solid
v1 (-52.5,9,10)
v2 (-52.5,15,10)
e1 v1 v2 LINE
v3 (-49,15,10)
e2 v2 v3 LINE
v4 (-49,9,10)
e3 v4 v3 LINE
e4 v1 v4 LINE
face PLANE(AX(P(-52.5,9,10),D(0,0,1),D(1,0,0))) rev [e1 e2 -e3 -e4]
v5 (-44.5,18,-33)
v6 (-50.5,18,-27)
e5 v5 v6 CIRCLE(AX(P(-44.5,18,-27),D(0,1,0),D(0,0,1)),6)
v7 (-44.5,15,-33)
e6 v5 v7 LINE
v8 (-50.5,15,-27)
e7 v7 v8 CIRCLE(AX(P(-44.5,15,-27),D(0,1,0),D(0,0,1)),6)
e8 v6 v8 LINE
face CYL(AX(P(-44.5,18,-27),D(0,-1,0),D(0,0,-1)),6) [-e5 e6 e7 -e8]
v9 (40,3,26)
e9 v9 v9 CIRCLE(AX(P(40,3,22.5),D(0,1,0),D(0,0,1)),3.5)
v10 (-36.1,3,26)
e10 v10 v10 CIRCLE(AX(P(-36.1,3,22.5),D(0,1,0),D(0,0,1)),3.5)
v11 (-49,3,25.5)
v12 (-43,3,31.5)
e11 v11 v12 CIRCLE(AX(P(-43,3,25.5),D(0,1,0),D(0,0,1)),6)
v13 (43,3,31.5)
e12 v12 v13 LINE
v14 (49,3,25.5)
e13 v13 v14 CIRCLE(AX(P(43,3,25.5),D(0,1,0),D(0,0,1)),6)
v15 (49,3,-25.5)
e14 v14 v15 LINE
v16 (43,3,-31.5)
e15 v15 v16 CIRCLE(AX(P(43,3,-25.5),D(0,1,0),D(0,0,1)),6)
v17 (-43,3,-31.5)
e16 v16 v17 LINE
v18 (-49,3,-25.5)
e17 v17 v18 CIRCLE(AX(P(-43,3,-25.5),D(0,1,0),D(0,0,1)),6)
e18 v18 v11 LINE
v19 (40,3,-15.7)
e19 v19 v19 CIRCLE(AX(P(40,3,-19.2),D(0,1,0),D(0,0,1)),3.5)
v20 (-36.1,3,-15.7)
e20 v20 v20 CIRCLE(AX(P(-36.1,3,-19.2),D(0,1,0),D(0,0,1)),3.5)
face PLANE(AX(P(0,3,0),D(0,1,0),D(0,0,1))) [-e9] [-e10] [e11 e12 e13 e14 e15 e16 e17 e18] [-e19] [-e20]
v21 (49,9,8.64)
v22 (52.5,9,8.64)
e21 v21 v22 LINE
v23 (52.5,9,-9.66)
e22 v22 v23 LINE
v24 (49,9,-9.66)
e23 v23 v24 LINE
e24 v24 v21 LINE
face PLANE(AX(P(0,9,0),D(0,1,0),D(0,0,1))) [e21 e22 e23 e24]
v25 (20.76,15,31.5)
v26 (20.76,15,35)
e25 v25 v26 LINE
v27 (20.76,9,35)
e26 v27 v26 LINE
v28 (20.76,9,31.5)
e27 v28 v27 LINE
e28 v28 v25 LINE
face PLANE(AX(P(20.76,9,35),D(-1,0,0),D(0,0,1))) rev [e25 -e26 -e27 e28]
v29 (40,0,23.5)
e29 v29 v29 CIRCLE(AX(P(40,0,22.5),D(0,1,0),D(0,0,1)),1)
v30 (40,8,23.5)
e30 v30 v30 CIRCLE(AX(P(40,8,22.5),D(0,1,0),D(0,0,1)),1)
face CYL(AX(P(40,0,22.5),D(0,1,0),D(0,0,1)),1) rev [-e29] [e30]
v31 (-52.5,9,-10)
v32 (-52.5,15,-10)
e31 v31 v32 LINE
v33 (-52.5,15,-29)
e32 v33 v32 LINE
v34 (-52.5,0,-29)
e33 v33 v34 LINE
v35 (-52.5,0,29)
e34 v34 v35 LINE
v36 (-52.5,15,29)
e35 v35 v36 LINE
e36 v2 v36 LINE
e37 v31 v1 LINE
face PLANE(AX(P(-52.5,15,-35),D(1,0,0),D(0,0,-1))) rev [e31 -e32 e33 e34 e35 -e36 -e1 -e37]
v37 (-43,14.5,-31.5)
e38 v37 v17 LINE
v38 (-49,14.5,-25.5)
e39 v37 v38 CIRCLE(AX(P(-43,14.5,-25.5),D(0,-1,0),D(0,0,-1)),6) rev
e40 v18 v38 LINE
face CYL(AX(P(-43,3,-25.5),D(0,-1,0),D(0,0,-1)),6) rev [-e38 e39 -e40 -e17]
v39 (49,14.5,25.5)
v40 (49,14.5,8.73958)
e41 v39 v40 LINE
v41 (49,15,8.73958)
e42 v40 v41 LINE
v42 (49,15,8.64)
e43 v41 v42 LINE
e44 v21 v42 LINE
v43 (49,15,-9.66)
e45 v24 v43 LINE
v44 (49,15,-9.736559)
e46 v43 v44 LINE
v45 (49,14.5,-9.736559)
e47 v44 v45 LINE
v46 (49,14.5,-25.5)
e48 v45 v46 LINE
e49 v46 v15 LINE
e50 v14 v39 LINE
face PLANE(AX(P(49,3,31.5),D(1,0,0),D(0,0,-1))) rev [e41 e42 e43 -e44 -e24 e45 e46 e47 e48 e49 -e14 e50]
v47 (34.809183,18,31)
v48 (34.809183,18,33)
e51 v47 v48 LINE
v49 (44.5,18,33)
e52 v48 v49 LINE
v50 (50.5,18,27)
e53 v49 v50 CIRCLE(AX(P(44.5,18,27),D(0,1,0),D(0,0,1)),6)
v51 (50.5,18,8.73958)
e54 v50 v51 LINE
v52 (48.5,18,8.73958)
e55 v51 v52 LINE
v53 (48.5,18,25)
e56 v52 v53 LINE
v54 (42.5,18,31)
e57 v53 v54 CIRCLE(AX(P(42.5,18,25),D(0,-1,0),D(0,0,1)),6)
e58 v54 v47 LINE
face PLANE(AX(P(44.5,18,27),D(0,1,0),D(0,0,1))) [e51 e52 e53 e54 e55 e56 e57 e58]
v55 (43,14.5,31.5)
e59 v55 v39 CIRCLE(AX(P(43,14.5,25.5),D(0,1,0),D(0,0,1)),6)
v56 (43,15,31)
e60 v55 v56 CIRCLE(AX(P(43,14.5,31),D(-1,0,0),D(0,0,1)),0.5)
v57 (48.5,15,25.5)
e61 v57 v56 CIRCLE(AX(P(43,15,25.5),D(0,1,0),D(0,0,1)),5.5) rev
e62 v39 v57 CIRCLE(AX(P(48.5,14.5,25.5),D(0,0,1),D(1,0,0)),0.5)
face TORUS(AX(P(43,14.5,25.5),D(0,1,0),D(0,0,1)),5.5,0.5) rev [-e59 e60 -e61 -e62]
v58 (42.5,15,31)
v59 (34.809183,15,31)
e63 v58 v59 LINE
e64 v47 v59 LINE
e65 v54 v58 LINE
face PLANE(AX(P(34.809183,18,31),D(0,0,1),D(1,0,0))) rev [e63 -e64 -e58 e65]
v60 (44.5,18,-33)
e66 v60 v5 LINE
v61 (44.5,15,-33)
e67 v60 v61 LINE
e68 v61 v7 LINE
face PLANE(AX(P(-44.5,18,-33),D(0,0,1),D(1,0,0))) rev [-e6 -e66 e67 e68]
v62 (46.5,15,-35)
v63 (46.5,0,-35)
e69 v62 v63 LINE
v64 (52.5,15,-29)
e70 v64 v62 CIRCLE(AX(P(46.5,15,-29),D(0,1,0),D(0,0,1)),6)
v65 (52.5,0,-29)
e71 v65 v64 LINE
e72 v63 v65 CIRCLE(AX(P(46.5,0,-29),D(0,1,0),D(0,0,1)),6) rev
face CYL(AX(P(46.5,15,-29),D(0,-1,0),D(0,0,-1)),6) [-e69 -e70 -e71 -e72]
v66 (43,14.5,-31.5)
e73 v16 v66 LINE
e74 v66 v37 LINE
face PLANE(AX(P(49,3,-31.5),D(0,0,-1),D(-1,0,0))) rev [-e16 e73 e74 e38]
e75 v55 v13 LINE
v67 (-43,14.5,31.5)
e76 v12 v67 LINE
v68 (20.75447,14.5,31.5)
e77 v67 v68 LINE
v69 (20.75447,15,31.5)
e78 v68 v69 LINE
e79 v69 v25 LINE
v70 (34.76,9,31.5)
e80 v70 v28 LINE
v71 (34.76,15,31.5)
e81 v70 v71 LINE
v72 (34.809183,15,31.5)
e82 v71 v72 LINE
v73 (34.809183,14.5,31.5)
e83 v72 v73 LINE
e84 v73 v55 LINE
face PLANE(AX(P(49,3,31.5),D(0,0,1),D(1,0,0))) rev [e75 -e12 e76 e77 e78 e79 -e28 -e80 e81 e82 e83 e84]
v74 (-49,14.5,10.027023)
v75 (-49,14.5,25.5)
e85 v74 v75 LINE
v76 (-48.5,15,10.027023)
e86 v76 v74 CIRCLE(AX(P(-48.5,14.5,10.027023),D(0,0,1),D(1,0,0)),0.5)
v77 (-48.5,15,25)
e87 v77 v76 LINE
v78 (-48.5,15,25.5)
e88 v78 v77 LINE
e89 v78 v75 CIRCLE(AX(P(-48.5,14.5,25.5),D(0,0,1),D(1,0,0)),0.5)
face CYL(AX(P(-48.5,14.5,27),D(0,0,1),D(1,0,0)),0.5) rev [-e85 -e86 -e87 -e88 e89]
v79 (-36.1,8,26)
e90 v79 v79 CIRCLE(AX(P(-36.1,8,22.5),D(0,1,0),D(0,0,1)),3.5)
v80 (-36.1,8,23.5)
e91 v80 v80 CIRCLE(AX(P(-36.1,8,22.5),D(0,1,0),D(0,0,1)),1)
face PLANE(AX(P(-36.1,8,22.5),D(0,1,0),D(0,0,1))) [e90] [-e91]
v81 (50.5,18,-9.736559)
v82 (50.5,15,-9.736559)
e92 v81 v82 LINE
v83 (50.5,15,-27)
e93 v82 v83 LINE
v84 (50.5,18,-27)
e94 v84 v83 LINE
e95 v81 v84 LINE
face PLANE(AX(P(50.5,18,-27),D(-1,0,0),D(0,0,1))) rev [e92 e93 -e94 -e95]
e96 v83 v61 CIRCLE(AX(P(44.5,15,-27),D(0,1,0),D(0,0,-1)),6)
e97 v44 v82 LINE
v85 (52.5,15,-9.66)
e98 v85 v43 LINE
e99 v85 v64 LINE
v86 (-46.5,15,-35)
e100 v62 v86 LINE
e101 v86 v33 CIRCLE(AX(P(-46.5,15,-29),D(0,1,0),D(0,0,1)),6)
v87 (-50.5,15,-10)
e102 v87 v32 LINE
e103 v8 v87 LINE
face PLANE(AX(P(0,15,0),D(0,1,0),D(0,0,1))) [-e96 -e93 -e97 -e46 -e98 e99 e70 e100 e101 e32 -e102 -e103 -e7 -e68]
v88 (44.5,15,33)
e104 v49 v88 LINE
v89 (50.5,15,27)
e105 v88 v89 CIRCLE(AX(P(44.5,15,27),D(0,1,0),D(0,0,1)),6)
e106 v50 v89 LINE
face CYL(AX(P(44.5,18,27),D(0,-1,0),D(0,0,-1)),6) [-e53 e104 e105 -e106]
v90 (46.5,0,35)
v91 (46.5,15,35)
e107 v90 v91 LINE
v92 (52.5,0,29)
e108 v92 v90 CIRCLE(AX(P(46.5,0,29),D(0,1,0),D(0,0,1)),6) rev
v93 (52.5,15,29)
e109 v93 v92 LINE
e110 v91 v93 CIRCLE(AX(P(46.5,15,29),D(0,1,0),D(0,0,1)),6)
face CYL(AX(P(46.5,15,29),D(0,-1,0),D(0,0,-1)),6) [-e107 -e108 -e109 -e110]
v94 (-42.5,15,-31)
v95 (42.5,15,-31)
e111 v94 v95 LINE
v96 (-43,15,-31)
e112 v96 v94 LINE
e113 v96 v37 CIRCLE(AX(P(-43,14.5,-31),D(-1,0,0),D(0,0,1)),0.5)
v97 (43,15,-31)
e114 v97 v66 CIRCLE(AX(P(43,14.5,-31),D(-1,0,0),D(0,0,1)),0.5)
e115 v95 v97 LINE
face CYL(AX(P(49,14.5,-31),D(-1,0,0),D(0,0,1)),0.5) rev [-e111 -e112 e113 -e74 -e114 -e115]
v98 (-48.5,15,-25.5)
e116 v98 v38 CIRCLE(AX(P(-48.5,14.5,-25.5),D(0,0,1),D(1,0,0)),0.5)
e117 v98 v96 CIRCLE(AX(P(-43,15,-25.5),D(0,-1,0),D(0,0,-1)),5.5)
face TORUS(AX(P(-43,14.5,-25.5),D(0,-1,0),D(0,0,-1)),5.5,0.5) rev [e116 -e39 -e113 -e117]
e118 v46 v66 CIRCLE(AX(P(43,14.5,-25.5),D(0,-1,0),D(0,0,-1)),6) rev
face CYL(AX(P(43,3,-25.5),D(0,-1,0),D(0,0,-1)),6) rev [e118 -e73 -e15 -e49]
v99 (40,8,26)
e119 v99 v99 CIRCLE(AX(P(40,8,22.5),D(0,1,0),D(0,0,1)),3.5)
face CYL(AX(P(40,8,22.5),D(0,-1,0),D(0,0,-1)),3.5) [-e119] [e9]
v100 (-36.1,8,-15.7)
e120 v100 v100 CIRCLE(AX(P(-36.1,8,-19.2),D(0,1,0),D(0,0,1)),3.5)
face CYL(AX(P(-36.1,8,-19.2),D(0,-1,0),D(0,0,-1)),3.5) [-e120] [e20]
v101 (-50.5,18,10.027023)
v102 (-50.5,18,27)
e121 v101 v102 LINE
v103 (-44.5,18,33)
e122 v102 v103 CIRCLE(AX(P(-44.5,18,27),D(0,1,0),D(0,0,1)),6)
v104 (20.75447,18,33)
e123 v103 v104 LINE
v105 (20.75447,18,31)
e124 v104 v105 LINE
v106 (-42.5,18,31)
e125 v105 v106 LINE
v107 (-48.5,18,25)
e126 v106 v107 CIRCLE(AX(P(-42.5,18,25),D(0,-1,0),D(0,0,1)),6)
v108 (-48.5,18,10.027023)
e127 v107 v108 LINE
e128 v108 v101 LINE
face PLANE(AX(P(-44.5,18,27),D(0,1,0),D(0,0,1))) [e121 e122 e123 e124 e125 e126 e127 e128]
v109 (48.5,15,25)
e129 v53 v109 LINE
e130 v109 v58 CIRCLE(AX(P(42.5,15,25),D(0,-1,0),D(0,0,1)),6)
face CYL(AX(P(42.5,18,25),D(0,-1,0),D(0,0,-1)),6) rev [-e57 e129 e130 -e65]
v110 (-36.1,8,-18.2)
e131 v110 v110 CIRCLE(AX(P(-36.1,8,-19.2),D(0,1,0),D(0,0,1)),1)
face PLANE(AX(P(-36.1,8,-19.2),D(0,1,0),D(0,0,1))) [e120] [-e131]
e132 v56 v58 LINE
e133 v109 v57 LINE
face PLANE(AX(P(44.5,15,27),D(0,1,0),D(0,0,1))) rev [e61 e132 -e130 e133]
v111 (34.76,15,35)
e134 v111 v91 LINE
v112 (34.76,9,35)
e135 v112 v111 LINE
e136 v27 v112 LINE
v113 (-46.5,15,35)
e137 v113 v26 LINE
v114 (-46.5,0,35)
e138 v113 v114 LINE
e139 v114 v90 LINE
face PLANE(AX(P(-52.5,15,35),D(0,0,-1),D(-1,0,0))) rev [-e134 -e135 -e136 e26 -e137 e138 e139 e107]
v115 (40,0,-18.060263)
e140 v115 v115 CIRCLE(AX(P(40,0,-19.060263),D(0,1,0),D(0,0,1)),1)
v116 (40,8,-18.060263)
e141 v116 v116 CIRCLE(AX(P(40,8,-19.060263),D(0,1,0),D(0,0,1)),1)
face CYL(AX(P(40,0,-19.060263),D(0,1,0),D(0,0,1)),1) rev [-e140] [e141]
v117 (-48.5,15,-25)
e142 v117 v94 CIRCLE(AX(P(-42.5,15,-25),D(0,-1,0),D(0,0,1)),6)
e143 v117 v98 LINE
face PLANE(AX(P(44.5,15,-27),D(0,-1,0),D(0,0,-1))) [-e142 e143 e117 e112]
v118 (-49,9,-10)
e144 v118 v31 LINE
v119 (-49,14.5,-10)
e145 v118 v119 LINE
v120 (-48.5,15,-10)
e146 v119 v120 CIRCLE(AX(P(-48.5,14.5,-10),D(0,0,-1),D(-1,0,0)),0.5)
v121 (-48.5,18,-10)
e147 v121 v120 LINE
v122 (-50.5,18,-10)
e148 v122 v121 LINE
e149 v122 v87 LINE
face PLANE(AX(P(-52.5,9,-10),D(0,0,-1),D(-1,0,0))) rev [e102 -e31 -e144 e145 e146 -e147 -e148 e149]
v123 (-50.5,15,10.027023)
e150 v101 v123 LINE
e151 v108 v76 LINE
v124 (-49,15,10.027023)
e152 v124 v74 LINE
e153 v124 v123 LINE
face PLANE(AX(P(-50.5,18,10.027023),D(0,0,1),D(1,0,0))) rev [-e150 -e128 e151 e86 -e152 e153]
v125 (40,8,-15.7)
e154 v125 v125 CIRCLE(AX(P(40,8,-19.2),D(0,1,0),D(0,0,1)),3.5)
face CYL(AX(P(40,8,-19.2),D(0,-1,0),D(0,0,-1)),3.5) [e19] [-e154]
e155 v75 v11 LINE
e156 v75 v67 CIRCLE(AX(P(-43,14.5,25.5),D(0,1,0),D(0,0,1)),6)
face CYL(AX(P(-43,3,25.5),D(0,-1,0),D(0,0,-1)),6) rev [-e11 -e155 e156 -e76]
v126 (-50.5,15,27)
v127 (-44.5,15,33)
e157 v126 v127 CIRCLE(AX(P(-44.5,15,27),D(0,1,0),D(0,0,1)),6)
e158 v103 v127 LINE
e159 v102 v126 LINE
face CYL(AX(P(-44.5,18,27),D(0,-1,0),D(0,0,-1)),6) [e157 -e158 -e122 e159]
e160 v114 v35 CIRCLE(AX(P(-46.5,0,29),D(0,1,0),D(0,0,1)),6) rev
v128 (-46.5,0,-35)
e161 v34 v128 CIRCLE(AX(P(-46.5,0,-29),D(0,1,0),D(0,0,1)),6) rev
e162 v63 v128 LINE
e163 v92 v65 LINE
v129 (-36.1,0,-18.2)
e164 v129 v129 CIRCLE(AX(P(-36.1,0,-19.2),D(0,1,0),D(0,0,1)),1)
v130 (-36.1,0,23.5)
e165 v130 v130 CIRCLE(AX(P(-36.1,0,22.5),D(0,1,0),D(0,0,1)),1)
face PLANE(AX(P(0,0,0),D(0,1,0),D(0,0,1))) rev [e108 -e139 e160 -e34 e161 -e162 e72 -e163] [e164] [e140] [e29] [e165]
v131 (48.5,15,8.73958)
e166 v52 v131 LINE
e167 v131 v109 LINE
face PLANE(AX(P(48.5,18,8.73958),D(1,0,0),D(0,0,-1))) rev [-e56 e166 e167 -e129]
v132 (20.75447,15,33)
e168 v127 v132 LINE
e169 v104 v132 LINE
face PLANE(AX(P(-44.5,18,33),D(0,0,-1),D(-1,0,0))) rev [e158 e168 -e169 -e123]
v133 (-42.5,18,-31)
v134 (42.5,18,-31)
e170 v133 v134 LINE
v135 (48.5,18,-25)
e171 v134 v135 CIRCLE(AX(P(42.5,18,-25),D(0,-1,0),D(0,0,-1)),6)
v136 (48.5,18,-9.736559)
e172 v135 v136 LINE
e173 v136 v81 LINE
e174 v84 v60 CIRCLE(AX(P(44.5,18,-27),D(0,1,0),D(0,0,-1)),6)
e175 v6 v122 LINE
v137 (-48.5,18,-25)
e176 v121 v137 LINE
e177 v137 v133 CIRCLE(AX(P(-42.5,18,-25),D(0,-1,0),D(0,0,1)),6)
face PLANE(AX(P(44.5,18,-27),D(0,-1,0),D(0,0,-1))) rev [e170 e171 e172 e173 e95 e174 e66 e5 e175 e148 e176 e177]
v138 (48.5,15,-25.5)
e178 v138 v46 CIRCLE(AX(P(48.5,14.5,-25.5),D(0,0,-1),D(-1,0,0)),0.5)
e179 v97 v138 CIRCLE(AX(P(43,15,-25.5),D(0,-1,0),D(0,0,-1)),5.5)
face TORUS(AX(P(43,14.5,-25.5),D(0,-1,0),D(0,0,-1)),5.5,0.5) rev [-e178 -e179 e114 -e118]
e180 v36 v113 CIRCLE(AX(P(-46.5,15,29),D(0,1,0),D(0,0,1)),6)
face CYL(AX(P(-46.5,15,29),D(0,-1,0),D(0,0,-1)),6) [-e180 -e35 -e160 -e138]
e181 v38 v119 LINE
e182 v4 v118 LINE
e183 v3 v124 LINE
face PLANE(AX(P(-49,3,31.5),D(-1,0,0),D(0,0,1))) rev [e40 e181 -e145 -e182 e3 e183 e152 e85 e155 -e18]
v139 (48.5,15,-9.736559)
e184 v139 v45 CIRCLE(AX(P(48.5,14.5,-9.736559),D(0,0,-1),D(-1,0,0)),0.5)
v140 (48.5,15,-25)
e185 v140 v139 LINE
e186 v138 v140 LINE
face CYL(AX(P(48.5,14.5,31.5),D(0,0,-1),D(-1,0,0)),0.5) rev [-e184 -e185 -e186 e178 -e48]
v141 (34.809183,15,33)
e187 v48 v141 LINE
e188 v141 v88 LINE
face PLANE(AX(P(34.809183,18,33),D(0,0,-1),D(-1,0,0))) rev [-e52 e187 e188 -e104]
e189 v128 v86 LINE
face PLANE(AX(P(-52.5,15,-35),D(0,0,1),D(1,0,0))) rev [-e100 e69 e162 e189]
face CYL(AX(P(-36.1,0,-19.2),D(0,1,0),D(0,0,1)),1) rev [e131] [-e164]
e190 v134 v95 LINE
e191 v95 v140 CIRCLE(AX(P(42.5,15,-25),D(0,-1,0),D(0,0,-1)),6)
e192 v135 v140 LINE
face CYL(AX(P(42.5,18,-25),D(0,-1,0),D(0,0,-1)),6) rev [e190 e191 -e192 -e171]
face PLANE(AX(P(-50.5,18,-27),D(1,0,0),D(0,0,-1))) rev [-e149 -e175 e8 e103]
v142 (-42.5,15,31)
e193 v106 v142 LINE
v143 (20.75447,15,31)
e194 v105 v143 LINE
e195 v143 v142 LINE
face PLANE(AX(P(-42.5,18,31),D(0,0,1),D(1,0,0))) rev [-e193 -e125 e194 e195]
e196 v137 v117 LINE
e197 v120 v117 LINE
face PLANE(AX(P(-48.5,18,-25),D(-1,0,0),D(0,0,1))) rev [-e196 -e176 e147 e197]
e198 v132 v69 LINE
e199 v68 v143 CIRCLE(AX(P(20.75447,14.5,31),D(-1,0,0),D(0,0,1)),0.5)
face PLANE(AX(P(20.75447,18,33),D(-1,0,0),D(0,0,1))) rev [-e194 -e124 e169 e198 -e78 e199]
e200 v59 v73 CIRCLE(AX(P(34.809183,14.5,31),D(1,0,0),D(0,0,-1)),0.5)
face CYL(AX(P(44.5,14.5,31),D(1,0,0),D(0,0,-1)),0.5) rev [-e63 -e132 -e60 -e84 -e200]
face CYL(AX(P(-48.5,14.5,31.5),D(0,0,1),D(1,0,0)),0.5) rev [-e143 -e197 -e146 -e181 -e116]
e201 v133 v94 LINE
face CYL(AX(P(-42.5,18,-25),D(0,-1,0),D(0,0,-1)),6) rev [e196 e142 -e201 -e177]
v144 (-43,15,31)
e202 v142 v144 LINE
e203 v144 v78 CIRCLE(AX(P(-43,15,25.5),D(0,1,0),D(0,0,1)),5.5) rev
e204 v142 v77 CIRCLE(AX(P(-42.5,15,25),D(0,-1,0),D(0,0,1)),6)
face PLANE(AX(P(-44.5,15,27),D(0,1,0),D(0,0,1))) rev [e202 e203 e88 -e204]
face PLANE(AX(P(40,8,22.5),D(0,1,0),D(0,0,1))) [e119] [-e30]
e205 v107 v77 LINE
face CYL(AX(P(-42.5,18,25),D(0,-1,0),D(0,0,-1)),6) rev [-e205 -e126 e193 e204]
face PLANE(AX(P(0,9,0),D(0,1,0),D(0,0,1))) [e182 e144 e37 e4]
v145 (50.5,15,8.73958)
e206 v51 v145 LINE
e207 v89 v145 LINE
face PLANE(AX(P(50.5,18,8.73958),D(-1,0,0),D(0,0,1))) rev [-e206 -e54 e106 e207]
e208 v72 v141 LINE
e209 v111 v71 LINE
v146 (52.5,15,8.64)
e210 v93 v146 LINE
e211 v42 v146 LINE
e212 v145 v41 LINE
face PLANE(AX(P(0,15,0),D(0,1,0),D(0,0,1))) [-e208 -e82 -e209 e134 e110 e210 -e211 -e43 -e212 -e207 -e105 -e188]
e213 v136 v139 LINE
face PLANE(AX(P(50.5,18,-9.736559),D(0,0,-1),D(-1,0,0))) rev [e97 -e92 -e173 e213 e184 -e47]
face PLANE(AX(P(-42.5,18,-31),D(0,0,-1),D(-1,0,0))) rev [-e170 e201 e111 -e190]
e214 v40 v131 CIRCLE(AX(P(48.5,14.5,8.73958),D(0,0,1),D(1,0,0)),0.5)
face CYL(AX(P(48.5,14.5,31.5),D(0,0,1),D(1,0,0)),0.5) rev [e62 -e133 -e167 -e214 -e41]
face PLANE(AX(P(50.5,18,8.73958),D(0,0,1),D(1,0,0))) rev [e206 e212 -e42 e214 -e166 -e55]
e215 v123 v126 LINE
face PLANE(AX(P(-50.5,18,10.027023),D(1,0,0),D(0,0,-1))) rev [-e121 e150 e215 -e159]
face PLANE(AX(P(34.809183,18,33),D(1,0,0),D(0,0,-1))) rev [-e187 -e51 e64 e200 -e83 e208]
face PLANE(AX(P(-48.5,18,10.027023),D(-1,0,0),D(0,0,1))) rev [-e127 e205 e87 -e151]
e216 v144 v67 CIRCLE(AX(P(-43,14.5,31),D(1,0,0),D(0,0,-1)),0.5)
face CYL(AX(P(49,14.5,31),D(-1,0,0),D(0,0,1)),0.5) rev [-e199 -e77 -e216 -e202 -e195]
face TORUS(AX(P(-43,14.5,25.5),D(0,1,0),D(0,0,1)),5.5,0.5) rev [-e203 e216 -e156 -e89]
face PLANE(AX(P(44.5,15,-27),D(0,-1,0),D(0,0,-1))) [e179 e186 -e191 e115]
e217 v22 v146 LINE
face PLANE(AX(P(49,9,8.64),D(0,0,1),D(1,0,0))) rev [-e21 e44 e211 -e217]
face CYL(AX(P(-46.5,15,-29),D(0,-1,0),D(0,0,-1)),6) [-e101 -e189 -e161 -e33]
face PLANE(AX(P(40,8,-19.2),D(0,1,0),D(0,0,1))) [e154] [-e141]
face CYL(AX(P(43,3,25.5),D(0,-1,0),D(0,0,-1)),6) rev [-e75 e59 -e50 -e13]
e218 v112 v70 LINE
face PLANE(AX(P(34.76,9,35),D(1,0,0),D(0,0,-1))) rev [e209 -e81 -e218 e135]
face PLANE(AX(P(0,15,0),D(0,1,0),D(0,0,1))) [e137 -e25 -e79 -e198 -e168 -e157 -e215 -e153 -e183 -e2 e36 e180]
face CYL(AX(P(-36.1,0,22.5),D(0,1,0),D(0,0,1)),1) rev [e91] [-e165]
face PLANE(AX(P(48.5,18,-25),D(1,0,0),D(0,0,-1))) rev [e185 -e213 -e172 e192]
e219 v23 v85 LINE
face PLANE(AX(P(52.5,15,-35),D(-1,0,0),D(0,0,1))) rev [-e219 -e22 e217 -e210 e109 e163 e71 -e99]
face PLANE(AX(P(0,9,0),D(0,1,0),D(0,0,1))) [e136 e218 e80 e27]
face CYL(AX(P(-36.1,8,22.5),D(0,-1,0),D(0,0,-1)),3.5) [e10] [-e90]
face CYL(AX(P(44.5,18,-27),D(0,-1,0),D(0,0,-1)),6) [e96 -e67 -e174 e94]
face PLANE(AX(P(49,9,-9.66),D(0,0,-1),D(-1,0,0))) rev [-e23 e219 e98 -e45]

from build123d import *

# Parameters (mm, degrees)
SKETCH1_W           = 105
SKETCH1_H           = 70
BOSS_EXTRUDE1_DEPTH = 15
SKETCH3_W           = 98
SKETCH3_H           = 63
CUT_EXTRUDE1_DEPTH  = 12
FILLET1_R           = 6
SKETCH4_R           = 3.5
BOSS_EXTRUDE2_DEPTH = 5
SKETCH5_R           = 1
CUT_EXTRUDE2_DEPTH  = 8
SKETCH6_W           = 3.5
SKETCH6_H           = 18.3
SKETCH6_W_2         = 14
SKETCH6_H_2         = 3.5
SKETCH6_H_3         = 20
CUT_EXTRUDE3_DEPTH  = 6
BOSS_EXTRUDE3_DEPTH = 3
FILLET2_R           = 0.5


with BuildPart() as part:
    # Sketch1 → Boss-Extrude1 (new body)
    with BuildSketch(Plane(origin=(0, 0, 0), x_dir=(1, 0, 0), z_dir=(0, 1, 0))):
        Rectangle(SKETCH1_W, SKETCH1_H)
    extrude(amount=BOSS_EXTRUDE1_DEPTH)

    # Sketch3 → Cut-Extrude1 (cut)
    with BuildSketch(Plane(origin=(0, 15, 0), x_dir=(1, 0, 0), z_dir=(0, 1, 0))):
        Rectangle(SKETCH3_W, SKETCH3_H)
    extrude(amount=-CUT_EXTRUDE1_DEPTH, mode=Mode.SUBTRACT)

    # Fillet1
    fillet1_edges = [part.edges().sort_by_distance(p)[0] for p in [
        (-49, 9, 31.5),
        (-49, 9, -31.5),
        (49, 9, -31.5),
        (49, 9, 31.5),
        (52.5, 7.5, 35),
        (-52.5, 7.5, 35),
        (-52.5, 7.5, -35),
        (52.5, 7.5, -35),
    ]]
    fillet(fillet1_edges, radius=FILLET1_R)

    # Sketch4 → Boss-Extrude2 (add)
    with BuildSketch(Plane(origin=(0, 3, 0), x_dir=(1, 0, 0), z_dir=(0, 1, 0))):
        with Locations(Location((40, -22.5, 0), (0, 0, 270))):
            Circle(SKETCH4_R)
        with Locations(Location((40, 19.2, 0), (0, 0, 270))):
            Circle(SKETCH4_R)
        with Locations(Location((-36.1, -22.5, 0), (0, 0, 270))):
            Circle(SKETCH4_R)
        with Locations(Location((-36.1, 19.2, 0), (0, 0, 270))):
            Circle(SKETCH4_R)
    extrude(amount=BOSS_EXTRUDE2_DEPTH)

    # Sketch5 → Cut-Extrude2 (cut)
    with BuildSketch(Plane(origin=(0, 8, 0), x_dir=(1, 0, 0), z_dir=(0, 1, 0))):
        with Locations(Location((-36.1, 19.2, 0), (0, 0, 270))):
            Circle(SKETCH5_R)
        with Locations(Location((-36.1, -22.5, 0), (0, 0, 270))):
            Circle(SKETCH5_R)
        with Locations(Location((40, -22.5, 0), (0, 0, 270))):
            Circle(SKETCH5_R)
        with Locations(Location((40, 19.06026255, 0), (0, 0, 270))):
            Circle(SKETCH5_R)
    extrude(amount=-CUT_EXTRUDE2_DEPTH, mode=Mode.SUBTRACT)

    # Sketch6 → Cut-Extrude3 (cut)
    with BuildSketch(Plane(origin=(0, 15, 0), x_dir=(1, 0, 0), z_dir=(0, 1, 0))):
        with Locations((50.75, 0.51)):
            Rectangle(SKETCH6_W, SKETCH6_H)
        with Locations((27.76, -33.25)):
            Rectangle(SKETCH6_W_2, SKETCH6_H_2)
        with Locations((-50.75, 0)):
            Rectangle(SKETCH6_W, SKETCH6_H_3)
    extrude(amount=-CUT_EXTRUDE3_DEPTH, mode=Mode.SUBTRACT)

    # Sketch7 → Boss-Extrude3 (add)
    with BuildSketch(Plane(origin=(0, 15, 0), x_dir=(1, 0, 0), z_dir=(0, 1, 0))):
        with BuildLine():
            Line((-44.5, 33), (44.5, 33))
            ThreePointArc((44.5, 33), (48.742640687, 31.242640687), (50.5, 27))
            Line((50.5, 27), (50.5, 9.736559035))
            Line((50.5, 9.736559035), (48.5, 9.736559035))
            Line((48.5, 9.736559035), (48.5, 25))
            ThreePointArc((48.5, 25), (46.742640687, 29.242640687), (42.5, 31))
            Line((42.5, 31), (-42.5, 31))
            ThreePointArc((-42.5, 31), (-46.742640687, 29.242640687), (-48.5, 25))
            Line((-48.5, 25), (-48.5, 10))
            Line((-48.5, 10), (-50.5, 10))
            Line((-50.5, 10), (-50.5, 27))
            ThreePointArc((-50.5, 27), (-48.742640687, 31.242640687), (-44.5, 33))
        make_face()
        with BuildLine():
            Line((-44.5, -33), (20.754470261, -33))
            Line((20.754470261, -33), (20.754470261, -31))
            Line((20.754470261, -31), (-42.5, -31))
            ThreePointArc((-42.5, -31), (-46.742640687, -29.242640687), (-48.5, -25))
            Line((-48.5, -25), (-48.5, -10.02702289))
            Line((-48.5, -10.02702289), (-50.5, -10.02702289))
            Line((-50.5, -10.02702289), (-50.5, -27))
            ThreePointArc((-50.5, -27), (-48.742640687, -31.242640687), (-44.5, -33))
        make_face()
        with BuildLine():
            Line((50.5, -8.739580153), (50.5, -27))
            ThreePointArc((50.5, -27), (48.742640687, -31.242640687), (44.5, -33))
            Line((44.5, -33), (34.809182833, -33))
            Line((34.809182833, -33), (34.809182833, -31))
            Line((34.809182833, -31), (42.5, -31))
            ThreePointArc((42.5, -31), (46.742640687, -29.242640687), (48.5, -25))
            Line((48.5, -25), (48.5, -8.739580153))
            Line((48.5, -8.739580153), (50.5, -8.739580153))
        make_face()
    extrude(amount=BOSS_EXTRUDE3_DEPTH)

    # Fillet2
    fillet2_edges = [part.edges().sort_by_distance(p)[0] for p in [
        (49, 15, 17.119790077),
        (47.242640687, 15, 29.742640687),
        (-49, 15, 17.763511445),
        (-47.242640687, 15, 29.742640687),
        (49, 15, -17.618279517),
        (47.242640687, 15, -29.742640687),
        (-49, 15, -17.75),
        (-47.242640687, 15, -29.742640687),
        (38.904591417, 15, 31.5),
        (-11.12276487, 15, 31.5),
        (0, 15, -31.5),
    ]]
    fillet(fillet2_edges, radius=FILLET2_R - 0.0001)  # a hair under: the kernel refuses the full size


solid = part.part
